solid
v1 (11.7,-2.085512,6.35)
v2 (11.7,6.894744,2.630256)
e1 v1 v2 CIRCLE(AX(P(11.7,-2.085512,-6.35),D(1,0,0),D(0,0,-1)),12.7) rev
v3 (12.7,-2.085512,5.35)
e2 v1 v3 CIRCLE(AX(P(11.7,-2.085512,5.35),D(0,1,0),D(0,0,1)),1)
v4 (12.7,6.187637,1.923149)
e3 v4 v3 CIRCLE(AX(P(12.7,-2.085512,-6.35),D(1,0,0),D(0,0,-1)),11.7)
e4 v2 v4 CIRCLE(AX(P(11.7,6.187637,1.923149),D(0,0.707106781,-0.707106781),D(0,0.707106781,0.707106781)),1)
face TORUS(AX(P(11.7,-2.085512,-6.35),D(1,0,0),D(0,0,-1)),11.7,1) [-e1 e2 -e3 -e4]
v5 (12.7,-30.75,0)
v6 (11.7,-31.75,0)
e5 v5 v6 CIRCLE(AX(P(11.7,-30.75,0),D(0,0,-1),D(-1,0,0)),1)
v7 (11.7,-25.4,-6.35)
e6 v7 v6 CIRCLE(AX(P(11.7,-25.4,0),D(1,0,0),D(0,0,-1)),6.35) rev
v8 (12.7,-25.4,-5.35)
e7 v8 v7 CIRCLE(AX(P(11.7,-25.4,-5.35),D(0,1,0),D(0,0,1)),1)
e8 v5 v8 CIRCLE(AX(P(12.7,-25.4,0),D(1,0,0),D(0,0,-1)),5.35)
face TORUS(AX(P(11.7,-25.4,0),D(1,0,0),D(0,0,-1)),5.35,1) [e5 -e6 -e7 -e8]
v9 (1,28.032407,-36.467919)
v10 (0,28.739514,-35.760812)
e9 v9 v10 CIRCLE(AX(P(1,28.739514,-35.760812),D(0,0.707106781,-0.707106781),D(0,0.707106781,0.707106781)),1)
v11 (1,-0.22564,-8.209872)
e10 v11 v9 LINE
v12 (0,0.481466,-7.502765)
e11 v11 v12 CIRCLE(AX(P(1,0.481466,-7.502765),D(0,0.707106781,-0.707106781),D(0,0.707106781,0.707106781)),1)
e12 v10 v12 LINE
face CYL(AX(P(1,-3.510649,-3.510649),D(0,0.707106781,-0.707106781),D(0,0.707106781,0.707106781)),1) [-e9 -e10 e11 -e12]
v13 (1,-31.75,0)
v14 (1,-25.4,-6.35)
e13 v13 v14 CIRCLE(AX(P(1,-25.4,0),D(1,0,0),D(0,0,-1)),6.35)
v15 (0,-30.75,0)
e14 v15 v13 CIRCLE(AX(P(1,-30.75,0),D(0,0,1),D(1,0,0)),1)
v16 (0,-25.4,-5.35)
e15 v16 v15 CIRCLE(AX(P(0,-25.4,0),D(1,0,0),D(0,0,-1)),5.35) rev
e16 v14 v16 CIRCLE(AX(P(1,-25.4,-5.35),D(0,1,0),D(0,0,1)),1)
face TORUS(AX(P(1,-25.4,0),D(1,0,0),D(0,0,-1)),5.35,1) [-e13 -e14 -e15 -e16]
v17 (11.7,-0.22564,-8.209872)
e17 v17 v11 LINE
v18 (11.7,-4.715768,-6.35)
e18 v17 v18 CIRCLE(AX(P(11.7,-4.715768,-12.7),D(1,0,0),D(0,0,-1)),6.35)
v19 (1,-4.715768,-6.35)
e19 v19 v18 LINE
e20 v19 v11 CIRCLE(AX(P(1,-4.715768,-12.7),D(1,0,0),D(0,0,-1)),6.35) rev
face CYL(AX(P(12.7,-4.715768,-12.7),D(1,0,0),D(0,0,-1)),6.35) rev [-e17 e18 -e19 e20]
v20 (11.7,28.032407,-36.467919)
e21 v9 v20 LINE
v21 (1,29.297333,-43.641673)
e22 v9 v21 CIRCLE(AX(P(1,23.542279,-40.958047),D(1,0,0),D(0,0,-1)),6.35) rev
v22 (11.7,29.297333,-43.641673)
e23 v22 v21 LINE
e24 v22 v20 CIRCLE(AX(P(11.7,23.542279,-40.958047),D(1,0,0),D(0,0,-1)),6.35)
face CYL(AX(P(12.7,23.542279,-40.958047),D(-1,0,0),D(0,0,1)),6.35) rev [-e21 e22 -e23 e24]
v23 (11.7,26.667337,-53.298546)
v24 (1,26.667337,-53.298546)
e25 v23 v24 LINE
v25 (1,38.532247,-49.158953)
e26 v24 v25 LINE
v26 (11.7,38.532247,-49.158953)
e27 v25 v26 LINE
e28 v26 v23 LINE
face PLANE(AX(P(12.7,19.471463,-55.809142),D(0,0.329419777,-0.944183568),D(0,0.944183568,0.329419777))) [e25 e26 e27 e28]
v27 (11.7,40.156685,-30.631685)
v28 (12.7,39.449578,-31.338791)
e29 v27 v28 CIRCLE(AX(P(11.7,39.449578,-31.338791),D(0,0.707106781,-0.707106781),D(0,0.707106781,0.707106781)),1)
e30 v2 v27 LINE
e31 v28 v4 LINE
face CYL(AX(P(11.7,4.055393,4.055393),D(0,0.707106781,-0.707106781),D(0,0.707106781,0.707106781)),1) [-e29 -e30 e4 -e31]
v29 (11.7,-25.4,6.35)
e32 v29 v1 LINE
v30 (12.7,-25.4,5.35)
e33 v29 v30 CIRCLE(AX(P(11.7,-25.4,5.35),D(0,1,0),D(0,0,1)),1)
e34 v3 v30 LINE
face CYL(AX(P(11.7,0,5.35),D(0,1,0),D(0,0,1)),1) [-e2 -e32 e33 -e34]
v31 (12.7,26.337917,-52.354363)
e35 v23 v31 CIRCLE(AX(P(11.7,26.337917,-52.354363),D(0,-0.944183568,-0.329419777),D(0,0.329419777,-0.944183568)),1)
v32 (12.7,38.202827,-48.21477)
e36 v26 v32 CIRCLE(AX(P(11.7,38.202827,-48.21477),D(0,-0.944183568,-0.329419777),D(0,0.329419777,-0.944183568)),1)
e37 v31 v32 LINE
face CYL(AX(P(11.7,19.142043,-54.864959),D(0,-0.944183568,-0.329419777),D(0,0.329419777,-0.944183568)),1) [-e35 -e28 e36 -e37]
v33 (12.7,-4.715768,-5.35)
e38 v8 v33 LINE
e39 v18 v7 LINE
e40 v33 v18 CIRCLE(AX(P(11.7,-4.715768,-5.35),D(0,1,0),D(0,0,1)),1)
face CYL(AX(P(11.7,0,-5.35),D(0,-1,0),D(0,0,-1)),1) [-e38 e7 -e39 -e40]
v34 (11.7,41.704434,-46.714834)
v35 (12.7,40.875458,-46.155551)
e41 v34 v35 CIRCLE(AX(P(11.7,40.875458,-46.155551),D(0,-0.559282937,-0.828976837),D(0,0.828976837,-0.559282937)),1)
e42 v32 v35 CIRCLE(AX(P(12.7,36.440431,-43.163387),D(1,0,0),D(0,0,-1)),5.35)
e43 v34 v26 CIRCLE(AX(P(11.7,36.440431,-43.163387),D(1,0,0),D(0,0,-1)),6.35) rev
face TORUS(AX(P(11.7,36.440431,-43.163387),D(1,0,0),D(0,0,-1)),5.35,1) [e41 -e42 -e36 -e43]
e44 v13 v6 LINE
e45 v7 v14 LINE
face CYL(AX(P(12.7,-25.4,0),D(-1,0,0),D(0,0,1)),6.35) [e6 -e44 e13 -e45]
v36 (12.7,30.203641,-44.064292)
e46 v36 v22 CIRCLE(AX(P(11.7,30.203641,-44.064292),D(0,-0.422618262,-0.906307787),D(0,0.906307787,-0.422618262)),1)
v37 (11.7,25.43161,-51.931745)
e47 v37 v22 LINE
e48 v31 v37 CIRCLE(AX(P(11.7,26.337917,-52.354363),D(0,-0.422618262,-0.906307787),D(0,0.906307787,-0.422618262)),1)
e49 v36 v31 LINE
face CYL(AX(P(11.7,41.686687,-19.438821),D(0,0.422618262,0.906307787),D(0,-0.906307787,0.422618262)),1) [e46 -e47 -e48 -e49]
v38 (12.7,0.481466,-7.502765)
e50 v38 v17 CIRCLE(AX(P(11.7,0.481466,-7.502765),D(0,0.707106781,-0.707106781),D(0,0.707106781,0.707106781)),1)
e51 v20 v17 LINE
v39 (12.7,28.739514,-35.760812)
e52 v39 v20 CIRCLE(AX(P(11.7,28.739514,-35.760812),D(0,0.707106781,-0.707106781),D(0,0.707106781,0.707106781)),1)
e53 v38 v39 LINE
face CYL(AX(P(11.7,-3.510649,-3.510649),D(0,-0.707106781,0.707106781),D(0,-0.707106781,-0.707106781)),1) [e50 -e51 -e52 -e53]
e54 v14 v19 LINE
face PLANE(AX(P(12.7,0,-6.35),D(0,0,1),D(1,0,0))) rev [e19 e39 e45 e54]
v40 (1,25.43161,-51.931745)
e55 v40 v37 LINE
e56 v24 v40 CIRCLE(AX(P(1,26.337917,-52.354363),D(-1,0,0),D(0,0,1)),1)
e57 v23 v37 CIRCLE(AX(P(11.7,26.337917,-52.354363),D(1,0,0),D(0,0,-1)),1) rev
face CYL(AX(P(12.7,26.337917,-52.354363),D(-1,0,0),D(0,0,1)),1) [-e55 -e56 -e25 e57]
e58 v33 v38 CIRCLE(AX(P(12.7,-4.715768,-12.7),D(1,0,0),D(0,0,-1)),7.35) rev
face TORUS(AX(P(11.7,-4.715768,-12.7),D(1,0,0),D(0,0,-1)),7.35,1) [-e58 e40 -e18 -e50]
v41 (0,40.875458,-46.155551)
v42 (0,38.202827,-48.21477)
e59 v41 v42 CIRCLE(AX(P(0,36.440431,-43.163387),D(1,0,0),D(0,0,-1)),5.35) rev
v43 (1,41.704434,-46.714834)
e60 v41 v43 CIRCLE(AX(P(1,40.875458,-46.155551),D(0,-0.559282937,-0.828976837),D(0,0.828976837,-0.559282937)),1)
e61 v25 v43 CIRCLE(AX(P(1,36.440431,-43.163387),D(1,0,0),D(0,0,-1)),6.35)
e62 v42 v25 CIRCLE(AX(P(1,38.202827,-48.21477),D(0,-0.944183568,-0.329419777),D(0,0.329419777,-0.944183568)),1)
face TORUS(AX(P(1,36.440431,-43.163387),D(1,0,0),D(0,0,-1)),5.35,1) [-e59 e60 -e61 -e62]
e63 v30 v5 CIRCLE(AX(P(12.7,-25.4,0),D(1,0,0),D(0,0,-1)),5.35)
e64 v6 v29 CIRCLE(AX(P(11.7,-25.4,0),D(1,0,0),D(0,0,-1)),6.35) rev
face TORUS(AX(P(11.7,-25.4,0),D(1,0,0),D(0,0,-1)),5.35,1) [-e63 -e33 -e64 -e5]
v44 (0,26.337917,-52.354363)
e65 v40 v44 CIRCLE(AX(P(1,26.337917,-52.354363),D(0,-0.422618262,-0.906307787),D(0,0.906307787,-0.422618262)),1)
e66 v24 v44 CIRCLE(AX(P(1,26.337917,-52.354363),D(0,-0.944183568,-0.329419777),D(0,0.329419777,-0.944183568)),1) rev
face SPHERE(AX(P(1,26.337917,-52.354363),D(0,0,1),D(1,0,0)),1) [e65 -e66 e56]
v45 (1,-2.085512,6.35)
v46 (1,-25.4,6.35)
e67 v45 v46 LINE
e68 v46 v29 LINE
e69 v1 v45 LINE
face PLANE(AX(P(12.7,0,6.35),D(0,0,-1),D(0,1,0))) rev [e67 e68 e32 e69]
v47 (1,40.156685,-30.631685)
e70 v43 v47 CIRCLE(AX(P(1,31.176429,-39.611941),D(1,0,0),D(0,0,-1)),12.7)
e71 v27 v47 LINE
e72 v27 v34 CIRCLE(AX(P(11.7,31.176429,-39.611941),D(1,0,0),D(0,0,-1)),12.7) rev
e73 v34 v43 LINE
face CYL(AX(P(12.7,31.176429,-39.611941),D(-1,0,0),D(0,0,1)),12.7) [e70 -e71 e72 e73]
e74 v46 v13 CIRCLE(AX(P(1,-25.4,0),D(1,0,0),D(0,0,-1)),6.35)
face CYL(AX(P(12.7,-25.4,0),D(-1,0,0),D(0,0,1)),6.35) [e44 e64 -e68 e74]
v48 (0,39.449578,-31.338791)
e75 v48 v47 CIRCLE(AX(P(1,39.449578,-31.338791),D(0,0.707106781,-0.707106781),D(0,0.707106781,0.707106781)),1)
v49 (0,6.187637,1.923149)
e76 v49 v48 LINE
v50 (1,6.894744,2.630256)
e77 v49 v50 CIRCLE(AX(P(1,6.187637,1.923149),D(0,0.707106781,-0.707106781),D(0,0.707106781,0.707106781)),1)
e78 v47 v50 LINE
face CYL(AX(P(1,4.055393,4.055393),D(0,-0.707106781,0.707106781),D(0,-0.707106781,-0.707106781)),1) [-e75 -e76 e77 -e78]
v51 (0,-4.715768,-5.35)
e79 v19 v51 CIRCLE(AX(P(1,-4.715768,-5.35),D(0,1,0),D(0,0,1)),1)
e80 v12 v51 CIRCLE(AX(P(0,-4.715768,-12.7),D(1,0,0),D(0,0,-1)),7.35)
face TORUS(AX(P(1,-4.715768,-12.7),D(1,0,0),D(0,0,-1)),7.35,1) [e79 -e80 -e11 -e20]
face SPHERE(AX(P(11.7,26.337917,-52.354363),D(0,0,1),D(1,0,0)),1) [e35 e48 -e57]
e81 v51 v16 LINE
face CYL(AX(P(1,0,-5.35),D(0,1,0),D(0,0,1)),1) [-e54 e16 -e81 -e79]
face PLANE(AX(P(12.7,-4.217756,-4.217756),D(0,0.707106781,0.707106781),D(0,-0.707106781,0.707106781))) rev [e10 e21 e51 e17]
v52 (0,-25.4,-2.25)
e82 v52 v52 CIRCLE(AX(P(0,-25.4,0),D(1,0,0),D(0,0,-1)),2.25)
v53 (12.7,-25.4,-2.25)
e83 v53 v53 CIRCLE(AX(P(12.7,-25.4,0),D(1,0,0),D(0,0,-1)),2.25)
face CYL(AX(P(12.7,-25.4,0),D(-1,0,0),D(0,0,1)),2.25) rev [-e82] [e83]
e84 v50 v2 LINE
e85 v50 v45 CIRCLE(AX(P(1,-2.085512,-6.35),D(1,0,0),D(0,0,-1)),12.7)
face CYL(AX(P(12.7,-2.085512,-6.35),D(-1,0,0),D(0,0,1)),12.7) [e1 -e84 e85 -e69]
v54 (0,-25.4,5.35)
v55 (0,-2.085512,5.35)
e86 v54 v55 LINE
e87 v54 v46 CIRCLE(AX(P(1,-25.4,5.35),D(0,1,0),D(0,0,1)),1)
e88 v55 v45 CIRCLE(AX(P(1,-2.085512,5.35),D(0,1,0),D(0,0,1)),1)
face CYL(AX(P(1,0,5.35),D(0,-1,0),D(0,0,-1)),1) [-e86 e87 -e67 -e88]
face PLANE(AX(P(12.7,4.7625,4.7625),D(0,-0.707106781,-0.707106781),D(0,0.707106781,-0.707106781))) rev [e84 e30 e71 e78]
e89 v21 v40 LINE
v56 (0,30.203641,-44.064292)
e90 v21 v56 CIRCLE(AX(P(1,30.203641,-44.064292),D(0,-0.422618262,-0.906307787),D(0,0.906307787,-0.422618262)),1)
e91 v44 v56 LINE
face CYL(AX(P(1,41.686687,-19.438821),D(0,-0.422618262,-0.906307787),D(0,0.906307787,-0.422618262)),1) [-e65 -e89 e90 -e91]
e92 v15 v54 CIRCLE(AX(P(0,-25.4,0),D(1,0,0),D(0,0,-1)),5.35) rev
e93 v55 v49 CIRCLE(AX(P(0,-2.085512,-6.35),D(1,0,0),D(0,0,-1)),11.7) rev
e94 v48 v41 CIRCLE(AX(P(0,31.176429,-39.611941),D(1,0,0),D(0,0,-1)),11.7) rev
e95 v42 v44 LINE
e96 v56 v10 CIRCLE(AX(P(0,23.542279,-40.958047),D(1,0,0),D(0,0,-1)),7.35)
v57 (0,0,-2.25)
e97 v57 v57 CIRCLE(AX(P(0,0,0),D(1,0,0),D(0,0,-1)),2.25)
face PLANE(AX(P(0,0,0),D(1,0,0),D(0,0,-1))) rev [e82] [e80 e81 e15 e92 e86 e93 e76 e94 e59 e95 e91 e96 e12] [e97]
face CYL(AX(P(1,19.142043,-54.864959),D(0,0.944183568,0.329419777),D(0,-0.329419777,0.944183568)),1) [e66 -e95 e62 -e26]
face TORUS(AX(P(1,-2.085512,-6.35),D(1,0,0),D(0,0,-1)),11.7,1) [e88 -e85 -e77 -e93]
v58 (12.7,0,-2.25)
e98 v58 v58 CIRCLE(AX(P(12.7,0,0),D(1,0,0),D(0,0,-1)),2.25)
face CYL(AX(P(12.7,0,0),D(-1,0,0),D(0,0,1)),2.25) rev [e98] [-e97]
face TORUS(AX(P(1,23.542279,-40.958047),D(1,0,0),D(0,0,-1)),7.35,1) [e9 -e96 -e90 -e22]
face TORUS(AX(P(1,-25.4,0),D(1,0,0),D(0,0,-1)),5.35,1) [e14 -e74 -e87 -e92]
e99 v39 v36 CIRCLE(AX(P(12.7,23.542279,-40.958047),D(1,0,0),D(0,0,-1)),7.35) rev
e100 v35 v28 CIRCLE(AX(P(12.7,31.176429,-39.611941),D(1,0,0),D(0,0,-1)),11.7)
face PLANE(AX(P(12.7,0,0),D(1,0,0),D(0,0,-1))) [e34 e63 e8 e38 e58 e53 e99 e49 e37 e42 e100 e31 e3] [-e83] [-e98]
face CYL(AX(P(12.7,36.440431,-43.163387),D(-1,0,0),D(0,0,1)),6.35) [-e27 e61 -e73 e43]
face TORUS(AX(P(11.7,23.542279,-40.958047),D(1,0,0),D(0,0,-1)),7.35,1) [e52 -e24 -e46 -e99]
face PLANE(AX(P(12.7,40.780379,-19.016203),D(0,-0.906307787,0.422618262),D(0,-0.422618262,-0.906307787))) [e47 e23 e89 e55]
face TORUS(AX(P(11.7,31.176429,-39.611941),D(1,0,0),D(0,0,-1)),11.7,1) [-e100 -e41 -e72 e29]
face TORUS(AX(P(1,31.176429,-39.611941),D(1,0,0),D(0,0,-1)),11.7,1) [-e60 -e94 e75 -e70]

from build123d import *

# Parameters (mm, degrees)
SKETCH1_R           = 2.25
BOSS_EXTRUDE1_DEPTH = 12.7
FILLET1_R           = 12.7
FILLET2_R           = 6.35
FILLET3_R           = 1


with BuildPart() as part:
    # Sketch1 → Boss-Extrude1 (new body)
    # profile 1 of 2: a face of its own
    with BuildSketch(Plane(origin=(0, 0, 0), x_dir=(0, 0, -1), z_dir=(1, 0, 0))):
        Polygon((48.592196898, 40.156684656), (39.611940777, 49.136940777), (-6.35, 3.175), (-6.35, -31.75), (6.35, -31.75), (6.35, -2.085512242), align=None)
        with Locations((0, -25.4)):
            Circle(SKETCH1_R, mode=Mode.SUBTRACT)
        Circle(SKETCH1_R, mode=Mode.SUBTRACT)
    # profile 2 of 2: a face of its own
    with BuildSketch(Plane(origin=(0, 0, 0), x_dir=(0, 0, -1), z_dir=(1, 0, 0))):
        Polygon((54.079029807, 24.430314129), (48.592196898, 40.156684656), (39.611940777, 31.176428535), align=None)
    extrude(amount=BOSS_EXTRUDE1_DEPTH)

    # Fillet1
    fillet1_edges = [part.edges().sort_by_distance(p)[0] for p in [
        (6.35, 3.175, 6.35),
        (6.35, 49.136940777, -39.611940777),
    ]]
    fillet(fillet1_edges, radius=FILLET1_R - 0.0001)  # a hair under: the kernel refuses the full size

    # Fillet2
    fillet2_edges = [part.edges().sort_by_distance(p)[0] for p in [
        (6.35, 31.176428535, -39.611940777),
        (6.35, -2.085512242, -6.35),
    ]]
    fillet(fillet2_edges, radius=FILLET2_R)
    fillet2_2_edges = [part.edges().sort_by_distance(p)[0] for p in [
        (6.35, 40.156684656, -48.592196898),
        (6.35, -31.75, 6.35),
        (6.35, -31.75, -6.35),
    ]]
    fillet(fillet2_2_edges, radius=FILLET2_R - 0.0004)  # a hair under: the kernel refuses the full size

    # Fillet3
    fillet3_edges = [part.edges().sort_by_distance(p)[0] for p in [
        (0, 26.863823768, -48.860351546),
        (6.35, 24.430314129, -54.079029807),
        (0, -13.74293541, 6.35),
        (12.7, -13.74293541, 6.35),
        (0, 23.525734978, -14.000734978),
        (0, 43.818086311, -38.395583818),
        (0, 2.774570502, 5.383277675),
        (12.7, 23.525734978, -14.000734978),
        (12.7, 2.774570502, 5.383277675),
        (12.7, 43.818086311, -38.395583818),
        (0, 31.48135692, -51.618964812),
        (0, 13.903383358, -22.338895601),
        (12.7, 26.863823768, -48.860351546),
        (0, -15.058084182, -6.35),
        (0, -29.890245218, -4.490245218),
        (0, -29.890245218, 4.490245218),
        (0, 40.316018936, -48.193567347),
        (12.7, 31.48135692, -51.618964812),
        (12.7, -15.058084182, -6.35),
        (12.7, 13.903383358, -22.338895601),
        (12.7, -29.890245218, -4.490245218),
        (12.7, -29.890245218, 4.490245218),
        (12.7, 40.316018936, -48.193567347),
        (0, 29.795808191, -39.855381394),
        (12.7, 29.795808191, -39.855381394),
        (0, -2.285728568, -6.833364969),
        (12.7, -2.285728568, -6.833364969),
    ]]
    fillet(fillet3_edges, radius=FILLET3_R)


solid = part.part
